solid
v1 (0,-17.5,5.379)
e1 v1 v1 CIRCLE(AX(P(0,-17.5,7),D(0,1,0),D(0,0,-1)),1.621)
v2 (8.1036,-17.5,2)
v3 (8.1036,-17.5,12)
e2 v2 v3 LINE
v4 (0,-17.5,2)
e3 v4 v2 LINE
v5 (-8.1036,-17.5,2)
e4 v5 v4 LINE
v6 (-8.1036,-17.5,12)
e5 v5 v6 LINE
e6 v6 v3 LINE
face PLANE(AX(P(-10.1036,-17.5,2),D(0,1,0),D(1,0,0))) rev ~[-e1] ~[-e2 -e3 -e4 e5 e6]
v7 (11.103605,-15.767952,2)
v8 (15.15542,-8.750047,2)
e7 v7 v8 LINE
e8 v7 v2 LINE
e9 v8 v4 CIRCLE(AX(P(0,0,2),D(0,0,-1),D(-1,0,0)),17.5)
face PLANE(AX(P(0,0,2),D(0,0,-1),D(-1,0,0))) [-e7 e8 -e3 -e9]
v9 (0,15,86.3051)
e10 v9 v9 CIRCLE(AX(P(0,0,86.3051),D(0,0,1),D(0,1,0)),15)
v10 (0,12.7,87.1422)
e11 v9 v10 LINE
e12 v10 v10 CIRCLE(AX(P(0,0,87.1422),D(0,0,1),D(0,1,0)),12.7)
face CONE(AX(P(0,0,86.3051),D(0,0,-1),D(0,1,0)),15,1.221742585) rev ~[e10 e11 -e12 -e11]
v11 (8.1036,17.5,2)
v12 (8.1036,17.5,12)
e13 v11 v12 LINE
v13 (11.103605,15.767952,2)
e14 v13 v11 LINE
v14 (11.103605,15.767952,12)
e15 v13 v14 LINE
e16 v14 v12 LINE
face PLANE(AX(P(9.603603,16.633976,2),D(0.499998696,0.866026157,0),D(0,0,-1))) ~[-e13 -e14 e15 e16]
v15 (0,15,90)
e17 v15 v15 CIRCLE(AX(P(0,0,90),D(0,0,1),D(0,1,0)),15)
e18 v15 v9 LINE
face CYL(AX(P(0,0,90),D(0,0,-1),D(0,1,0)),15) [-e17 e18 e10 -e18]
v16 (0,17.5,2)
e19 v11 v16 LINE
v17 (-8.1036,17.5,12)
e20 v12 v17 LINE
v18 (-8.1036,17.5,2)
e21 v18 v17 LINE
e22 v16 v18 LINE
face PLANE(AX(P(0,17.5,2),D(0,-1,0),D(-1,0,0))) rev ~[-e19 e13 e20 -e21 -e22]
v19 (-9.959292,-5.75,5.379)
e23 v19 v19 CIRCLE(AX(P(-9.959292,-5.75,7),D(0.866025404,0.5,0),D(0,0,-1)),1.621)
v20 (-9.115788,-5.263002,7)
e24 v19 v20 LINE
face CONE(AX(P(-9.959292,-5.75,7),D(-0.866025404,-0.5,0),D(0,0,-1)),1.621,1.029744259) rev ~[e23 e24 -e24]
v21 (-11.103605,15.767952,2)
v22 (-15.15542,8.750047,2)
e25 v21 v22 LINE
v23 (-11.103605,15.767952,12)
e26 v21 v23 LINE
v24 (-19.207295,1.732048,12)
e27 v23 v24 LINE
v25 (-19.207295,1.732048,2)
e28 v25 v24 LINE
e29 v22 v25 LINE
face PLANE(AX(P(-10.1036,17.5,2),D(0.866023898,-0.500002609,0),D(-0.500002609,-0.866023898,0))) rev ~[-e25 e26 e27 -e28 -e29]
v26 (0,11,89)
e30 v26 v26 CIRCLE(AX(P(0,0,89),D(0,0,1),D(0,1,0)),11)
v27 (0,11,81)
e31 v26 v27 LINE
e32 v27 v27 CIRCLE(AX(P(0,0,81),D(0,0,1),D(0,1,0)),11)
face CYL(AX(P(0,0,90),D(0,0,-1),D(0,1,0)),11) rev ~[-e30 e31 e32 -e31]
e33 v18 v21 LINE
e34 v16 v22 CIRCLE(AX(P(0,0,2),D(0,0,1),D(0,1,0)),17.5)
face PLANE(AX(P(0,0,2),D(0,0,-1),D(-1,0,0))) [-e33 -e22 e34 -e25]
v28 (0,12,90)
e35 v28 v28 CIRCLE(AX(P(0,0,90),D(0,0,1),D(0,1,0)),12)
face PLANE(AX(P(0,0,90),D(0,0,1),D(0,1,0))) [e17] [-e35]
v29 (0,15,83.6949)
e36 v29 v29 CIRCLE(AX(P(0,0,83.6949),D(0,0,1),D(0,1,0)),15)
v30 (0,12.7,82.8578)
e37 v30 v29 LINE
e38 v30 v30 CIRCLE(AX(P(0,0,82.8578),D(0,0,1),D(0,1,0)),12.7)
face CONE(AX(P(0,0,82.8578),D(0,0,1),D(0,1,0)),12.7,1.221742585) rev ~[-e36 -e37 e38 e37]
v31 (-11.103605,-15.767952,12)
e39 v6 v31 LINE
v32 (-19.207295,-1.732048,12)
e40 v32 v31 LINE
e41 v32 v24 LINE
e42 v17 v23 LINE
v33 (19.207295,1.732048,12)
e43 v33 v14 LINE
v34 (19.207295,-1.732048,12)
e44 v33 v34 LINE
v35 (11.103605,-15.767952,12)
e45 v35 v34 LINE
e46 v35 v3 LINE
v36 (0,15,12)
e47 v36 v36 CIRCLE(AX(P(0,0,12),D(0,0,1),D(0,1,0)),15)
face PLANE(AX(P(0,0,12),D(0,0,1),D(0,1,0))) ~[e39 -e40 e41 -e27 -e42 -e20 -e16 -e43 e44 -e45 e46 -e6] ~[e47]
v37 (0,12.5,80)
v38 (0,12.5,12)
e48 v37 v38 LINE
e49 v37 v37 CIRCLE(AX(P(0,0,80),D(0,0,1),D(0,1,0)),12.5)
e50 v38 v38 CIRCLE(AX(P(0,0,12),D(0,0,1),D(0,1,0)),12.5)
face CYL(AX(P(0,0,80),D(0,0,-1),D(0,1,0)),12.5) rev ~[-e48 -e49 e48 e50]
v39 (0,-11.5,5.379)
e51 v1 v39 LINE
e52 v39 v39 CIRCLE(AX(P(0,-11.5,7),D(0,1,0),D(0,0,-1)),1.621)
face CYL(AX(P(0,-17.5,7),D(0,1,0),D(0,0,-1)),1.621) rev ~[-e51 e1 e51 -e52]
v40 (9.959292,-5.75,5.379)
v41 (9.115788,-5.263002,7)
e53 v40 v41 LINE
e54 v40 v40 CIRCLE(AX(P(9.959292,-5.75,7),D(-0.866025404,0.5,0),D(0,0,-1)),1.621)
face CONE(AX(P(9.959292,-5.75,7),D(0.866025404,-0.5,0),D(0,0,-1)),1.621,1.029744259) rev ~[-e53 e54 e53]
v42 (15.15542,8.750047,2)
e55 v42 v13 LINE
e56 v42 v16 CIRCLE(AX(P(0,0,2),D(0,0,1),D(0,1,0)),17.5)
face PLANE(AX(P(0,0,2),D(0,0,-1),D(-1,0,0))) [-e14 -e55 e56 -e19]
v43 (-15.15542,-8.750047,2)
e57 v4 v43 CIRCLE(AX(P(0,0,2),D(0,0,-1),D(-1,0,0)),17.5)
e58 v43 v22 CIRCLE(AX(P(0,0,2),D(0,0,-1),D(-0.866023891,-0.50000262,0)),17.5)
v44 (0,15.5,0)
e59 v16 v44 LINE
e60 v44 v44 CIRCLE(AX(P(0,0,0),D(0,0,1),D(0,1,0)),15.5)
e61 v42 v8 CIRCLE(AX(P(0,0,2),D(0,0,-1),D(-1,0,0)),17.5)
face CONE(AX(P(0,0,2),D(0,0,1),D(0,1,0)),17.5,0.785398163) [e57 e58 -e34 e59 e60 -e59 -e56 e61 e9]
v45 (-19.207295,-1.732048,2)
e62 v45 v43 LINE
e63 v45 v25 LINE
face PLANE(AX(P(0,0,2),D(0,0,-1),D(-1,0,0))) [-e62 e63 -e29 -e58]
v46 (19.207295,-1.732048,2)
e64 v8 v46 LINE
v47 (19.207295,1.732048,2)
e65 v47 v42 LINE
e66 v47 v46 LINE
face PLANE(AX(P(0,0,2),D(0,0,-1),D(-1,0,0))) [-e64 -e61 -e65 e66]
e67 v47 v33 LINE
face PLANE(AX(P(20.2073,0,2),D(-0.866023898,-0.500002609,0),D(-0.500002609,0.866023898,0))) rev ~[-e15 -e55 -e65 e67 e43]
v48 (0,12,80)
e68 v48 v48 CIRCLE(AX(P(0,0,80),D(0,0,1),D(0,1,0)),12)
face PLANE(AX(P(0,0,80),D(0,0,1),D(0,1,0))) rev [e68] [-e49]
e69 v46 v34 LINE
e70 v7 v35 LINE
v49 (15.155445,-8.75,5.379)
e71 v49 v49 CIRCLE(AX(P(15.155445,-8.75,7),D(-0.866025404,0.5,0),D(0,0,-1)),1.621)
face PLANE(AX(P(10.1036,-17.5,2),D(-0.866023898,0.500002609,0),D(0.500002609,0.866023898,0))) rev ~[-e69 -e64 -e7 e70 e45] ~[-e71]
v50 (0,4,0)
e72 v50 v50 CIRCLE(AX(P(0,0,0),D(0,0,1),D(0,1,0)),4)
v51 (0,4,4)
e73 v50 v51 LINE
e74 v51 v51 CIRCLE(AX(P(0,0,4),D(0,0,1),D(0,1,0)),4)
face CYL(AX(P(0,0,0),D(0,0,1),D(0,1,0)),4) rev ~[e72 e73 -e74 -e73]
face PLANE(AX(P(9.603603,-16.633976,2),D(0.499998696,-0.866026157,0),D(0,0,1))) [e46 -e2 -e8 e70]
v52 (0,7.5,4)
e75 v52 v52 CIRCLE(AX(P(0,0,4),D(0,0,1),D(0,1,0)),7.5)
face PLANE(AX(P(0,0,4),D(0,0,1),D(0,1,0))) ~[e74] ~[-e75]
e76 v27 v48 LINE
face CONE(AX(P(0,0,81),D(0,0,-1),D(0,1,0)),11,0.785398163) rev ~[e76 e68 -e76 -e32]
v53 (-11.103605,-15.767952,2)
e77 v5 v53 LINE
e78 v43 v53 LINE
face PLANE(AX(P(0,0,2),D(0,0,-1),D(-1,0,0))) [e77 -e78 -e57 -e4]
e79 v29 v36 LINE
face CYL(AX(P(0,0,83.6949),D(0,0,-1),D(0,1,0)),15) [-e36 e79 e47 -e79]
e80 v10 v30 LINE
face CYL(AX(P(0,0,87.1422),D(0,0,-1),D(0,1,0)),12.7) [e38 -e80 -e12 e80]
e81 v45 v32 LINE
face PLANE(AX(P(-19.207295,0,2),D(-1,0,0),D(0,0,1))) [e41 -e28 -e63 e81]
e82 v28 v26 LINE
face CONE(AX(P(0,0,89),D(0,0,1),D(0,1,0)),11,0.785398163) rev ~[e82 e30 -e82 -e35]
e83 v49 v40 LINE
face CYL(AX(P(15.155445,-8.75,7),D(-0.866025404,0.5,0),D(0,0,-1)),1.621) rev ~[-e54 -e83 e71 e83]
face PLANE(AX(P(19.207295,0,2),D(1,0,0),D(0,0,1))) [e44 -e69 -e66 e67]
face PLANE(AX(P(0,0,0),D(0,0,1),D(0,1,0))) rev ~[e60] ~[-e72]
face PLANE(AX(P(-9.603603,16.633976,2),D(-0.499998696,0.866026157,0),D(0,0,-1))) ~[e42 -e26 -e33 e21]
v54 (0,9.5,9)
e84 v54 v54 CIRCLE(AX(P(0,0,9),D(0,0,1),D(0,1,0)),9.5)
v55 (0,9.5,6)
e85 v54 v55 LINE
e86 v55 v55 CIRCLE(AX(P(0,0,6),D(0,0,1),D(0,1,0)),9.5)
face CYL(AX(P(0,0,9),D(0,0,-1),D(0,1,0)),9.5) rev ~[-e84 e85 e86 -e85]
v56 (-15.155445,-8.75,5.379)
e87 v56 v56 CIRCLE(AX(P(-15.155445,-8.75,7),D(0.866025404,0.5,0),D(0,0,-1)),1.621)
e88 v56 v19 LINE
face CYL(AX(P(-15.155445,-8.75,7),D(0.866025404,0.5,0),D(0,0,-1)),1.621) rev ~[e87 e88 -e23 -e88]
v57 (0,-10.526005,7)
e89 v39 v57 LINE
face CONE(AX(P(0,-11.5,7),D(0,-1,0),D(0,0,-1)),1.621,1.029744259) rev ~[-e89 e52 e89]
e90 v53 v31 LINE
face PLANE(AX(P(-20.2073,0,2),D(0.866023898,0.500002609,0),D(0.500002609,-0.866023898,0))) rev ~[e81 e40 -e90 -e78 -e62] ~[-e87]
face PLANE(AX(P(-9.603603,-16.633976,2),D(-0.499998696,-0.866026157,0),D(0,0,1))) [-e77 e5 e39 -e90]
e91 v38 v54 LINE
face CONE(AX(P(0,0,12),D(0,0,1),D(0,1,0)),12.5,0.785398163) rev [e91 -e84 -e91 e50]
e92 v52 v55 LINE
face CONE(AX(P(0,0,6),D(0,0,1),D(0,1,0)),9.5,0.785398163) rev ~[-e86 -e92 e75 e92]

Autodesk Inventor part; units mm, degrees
ref_plane "YZ Plane" through (0, 0, 0) normal (1, 0, 0) x (0, 1, 0)
ref_plane "XZ Plane" through (0, 0, 0) normal (0, 1, 0) x (-1, 0, 0)
sketch "Esquisse1" plane through (0, 0, 0) normal (1, 0, 0) x (0, 1, 0)
  line L0 (0, 0) -> (0, 68.1349)
  line L1 (15, 83.6949) -> (15, 12)
  line L2 (15.5, 0) -> (4, 0)
  line L3 (4, 0) -> (4, 4)
  line L4 (4, 4) -> (9.5, 4)
  line L5 (15, 90) -> (11, 90)
  line L6 (15, 12) -> (17.5, 12)
  line L7 (17.5, 12) -> (17.5, 2)
  line L8 (17.5, 2) -> (15.5, 0)
  line L9 (12.5, 12) -> (9.5, 9)
  line L10 (9.5, 9) -> (9.5, 4)
  line L11 (11, 90) -> (11, 80)
  line L12 (11, 80) -> (12.5, 80)
  line L13 (12.5, 80) -> (12.5, 12)
  line L14 (15, 90) -> (15, 86.3051)
  line L15 (15, 86.3051) -> (12.7, 87.1422)
  line L16 (12.7, 87.1422) -> (12.7, 82.8578)
  line L17 (12.7, 82.8578) -> (15, 83.6949)
  circle A0 centre (14.2, 85) radius 1.5 construction
  dimension "d1" = 30
  dimension "d2" = 8
  dimension "d3" = 4
  dimension "d5" = 2.5
  dimension "d6" = 2
  dimension "d7" = 2
  dimension "d8" = 10
  dimension "d26" = 3
  dimension "d27" = 3
  dimension "d31" = 2.5
  dimension "d32" = 4
  dimension "d34" = 10
  dimension "d35" = 78
  dimension "d36" = 70
  dimension "d37" = 70
  dimension "d38" = 3
  dimension "d39" = 0.8
  dimension "d40" = 5
revolve "Révolution1" add sketch "Esquisse1" angle 360 about axis through (0, 0, 0) along (0, 0, 1)
ref_plane "Plan de construction1" through (0, 0, 2) normal (0, 0, -1) x (-1, 0, 0)
sketch "Esquisse3" plane through (0, 0, 2) normal (0, 0, -1) x (-1, 0, 0)
  line L0 (10.1036, 17.5) -> (20.2073, 0)
  line L1 (20.2073, 0) -> (10.1036, -17.5)
  line L2 (10.1036, -17.5) -> (-10.1036, -17.5)
  line L3 (-10.1036, -17.5) -> (-20.2073, 0)
  line L4 (-20.2073, 0) -> (-10.1036, 17.5)
  line L5 (-10.1036, 17.5) -> (10.1036, 17.5)
  circle A0 centre (0, 0) radius 17.5 projected
extrude "Extrusion1" add sketch "Esquisse3" against normal blind 10 contours L0 A0 L5 | L0 L1 A0 | A0 L4 L5 | A0 L3 L4 | L1 L2 A0 | A0 L2 L3
chamfer "Chanfrein1" distance 2 angle 45 1 edges at (0, -9.5, 4)
chamfer "Chanfrein2" distance 2 angle 45 6 edges at (10.1036, 17.5, 7) (-10.1036, 17.5, 7) (-20.2073, 0, 7) (-10.1036, -17.5, 7) (10.1036, -17.5, 7) (20.2073, 0, 7)
sketch "Esquisse4" plane through (-8.1036, -17.5, 2) normal (0, -1, 0) x (1, 0, 0)
  line L0 (16.2073, 10) -> (16.2073, 0) projected
  line L1 (0, 10) -> (16.2073, 10) projected
  line L2 (0, 0) -> (0, 10) projected
  line L3 (0, 0) -> (8.1036, 0) projected
  line L4 (8.1036, 0) -> (16.2073, 0) projected
  point P0 (8.1036, -2)
  point P1 (8.1036, 5)
  point P2 (16.2073, 5)
hole "Perçage1" at (0, -17.5, 7) direction (0, 1, 0) diameter 3.242 depth 6 tip angle 118 thread size "M4x0.7" class "6H" standard "ISO Metric profile"
chamfer "Chanfrein3" distance 1 angle 45 2 edges at (0, -11, 90) (0, -11, 80)
pattern_circular "Réseau circulaire1" count 3 over 120 about axis through (0, 0, -10) along (0, 0, 1) of "Perçage1" both ways yes
equation "\"d7\" = d6"
equation "\"d27\" = d26"
equation "\"d37\" = d36"
properties part number "piston_reservoir" material "Acier, galvanisé"
